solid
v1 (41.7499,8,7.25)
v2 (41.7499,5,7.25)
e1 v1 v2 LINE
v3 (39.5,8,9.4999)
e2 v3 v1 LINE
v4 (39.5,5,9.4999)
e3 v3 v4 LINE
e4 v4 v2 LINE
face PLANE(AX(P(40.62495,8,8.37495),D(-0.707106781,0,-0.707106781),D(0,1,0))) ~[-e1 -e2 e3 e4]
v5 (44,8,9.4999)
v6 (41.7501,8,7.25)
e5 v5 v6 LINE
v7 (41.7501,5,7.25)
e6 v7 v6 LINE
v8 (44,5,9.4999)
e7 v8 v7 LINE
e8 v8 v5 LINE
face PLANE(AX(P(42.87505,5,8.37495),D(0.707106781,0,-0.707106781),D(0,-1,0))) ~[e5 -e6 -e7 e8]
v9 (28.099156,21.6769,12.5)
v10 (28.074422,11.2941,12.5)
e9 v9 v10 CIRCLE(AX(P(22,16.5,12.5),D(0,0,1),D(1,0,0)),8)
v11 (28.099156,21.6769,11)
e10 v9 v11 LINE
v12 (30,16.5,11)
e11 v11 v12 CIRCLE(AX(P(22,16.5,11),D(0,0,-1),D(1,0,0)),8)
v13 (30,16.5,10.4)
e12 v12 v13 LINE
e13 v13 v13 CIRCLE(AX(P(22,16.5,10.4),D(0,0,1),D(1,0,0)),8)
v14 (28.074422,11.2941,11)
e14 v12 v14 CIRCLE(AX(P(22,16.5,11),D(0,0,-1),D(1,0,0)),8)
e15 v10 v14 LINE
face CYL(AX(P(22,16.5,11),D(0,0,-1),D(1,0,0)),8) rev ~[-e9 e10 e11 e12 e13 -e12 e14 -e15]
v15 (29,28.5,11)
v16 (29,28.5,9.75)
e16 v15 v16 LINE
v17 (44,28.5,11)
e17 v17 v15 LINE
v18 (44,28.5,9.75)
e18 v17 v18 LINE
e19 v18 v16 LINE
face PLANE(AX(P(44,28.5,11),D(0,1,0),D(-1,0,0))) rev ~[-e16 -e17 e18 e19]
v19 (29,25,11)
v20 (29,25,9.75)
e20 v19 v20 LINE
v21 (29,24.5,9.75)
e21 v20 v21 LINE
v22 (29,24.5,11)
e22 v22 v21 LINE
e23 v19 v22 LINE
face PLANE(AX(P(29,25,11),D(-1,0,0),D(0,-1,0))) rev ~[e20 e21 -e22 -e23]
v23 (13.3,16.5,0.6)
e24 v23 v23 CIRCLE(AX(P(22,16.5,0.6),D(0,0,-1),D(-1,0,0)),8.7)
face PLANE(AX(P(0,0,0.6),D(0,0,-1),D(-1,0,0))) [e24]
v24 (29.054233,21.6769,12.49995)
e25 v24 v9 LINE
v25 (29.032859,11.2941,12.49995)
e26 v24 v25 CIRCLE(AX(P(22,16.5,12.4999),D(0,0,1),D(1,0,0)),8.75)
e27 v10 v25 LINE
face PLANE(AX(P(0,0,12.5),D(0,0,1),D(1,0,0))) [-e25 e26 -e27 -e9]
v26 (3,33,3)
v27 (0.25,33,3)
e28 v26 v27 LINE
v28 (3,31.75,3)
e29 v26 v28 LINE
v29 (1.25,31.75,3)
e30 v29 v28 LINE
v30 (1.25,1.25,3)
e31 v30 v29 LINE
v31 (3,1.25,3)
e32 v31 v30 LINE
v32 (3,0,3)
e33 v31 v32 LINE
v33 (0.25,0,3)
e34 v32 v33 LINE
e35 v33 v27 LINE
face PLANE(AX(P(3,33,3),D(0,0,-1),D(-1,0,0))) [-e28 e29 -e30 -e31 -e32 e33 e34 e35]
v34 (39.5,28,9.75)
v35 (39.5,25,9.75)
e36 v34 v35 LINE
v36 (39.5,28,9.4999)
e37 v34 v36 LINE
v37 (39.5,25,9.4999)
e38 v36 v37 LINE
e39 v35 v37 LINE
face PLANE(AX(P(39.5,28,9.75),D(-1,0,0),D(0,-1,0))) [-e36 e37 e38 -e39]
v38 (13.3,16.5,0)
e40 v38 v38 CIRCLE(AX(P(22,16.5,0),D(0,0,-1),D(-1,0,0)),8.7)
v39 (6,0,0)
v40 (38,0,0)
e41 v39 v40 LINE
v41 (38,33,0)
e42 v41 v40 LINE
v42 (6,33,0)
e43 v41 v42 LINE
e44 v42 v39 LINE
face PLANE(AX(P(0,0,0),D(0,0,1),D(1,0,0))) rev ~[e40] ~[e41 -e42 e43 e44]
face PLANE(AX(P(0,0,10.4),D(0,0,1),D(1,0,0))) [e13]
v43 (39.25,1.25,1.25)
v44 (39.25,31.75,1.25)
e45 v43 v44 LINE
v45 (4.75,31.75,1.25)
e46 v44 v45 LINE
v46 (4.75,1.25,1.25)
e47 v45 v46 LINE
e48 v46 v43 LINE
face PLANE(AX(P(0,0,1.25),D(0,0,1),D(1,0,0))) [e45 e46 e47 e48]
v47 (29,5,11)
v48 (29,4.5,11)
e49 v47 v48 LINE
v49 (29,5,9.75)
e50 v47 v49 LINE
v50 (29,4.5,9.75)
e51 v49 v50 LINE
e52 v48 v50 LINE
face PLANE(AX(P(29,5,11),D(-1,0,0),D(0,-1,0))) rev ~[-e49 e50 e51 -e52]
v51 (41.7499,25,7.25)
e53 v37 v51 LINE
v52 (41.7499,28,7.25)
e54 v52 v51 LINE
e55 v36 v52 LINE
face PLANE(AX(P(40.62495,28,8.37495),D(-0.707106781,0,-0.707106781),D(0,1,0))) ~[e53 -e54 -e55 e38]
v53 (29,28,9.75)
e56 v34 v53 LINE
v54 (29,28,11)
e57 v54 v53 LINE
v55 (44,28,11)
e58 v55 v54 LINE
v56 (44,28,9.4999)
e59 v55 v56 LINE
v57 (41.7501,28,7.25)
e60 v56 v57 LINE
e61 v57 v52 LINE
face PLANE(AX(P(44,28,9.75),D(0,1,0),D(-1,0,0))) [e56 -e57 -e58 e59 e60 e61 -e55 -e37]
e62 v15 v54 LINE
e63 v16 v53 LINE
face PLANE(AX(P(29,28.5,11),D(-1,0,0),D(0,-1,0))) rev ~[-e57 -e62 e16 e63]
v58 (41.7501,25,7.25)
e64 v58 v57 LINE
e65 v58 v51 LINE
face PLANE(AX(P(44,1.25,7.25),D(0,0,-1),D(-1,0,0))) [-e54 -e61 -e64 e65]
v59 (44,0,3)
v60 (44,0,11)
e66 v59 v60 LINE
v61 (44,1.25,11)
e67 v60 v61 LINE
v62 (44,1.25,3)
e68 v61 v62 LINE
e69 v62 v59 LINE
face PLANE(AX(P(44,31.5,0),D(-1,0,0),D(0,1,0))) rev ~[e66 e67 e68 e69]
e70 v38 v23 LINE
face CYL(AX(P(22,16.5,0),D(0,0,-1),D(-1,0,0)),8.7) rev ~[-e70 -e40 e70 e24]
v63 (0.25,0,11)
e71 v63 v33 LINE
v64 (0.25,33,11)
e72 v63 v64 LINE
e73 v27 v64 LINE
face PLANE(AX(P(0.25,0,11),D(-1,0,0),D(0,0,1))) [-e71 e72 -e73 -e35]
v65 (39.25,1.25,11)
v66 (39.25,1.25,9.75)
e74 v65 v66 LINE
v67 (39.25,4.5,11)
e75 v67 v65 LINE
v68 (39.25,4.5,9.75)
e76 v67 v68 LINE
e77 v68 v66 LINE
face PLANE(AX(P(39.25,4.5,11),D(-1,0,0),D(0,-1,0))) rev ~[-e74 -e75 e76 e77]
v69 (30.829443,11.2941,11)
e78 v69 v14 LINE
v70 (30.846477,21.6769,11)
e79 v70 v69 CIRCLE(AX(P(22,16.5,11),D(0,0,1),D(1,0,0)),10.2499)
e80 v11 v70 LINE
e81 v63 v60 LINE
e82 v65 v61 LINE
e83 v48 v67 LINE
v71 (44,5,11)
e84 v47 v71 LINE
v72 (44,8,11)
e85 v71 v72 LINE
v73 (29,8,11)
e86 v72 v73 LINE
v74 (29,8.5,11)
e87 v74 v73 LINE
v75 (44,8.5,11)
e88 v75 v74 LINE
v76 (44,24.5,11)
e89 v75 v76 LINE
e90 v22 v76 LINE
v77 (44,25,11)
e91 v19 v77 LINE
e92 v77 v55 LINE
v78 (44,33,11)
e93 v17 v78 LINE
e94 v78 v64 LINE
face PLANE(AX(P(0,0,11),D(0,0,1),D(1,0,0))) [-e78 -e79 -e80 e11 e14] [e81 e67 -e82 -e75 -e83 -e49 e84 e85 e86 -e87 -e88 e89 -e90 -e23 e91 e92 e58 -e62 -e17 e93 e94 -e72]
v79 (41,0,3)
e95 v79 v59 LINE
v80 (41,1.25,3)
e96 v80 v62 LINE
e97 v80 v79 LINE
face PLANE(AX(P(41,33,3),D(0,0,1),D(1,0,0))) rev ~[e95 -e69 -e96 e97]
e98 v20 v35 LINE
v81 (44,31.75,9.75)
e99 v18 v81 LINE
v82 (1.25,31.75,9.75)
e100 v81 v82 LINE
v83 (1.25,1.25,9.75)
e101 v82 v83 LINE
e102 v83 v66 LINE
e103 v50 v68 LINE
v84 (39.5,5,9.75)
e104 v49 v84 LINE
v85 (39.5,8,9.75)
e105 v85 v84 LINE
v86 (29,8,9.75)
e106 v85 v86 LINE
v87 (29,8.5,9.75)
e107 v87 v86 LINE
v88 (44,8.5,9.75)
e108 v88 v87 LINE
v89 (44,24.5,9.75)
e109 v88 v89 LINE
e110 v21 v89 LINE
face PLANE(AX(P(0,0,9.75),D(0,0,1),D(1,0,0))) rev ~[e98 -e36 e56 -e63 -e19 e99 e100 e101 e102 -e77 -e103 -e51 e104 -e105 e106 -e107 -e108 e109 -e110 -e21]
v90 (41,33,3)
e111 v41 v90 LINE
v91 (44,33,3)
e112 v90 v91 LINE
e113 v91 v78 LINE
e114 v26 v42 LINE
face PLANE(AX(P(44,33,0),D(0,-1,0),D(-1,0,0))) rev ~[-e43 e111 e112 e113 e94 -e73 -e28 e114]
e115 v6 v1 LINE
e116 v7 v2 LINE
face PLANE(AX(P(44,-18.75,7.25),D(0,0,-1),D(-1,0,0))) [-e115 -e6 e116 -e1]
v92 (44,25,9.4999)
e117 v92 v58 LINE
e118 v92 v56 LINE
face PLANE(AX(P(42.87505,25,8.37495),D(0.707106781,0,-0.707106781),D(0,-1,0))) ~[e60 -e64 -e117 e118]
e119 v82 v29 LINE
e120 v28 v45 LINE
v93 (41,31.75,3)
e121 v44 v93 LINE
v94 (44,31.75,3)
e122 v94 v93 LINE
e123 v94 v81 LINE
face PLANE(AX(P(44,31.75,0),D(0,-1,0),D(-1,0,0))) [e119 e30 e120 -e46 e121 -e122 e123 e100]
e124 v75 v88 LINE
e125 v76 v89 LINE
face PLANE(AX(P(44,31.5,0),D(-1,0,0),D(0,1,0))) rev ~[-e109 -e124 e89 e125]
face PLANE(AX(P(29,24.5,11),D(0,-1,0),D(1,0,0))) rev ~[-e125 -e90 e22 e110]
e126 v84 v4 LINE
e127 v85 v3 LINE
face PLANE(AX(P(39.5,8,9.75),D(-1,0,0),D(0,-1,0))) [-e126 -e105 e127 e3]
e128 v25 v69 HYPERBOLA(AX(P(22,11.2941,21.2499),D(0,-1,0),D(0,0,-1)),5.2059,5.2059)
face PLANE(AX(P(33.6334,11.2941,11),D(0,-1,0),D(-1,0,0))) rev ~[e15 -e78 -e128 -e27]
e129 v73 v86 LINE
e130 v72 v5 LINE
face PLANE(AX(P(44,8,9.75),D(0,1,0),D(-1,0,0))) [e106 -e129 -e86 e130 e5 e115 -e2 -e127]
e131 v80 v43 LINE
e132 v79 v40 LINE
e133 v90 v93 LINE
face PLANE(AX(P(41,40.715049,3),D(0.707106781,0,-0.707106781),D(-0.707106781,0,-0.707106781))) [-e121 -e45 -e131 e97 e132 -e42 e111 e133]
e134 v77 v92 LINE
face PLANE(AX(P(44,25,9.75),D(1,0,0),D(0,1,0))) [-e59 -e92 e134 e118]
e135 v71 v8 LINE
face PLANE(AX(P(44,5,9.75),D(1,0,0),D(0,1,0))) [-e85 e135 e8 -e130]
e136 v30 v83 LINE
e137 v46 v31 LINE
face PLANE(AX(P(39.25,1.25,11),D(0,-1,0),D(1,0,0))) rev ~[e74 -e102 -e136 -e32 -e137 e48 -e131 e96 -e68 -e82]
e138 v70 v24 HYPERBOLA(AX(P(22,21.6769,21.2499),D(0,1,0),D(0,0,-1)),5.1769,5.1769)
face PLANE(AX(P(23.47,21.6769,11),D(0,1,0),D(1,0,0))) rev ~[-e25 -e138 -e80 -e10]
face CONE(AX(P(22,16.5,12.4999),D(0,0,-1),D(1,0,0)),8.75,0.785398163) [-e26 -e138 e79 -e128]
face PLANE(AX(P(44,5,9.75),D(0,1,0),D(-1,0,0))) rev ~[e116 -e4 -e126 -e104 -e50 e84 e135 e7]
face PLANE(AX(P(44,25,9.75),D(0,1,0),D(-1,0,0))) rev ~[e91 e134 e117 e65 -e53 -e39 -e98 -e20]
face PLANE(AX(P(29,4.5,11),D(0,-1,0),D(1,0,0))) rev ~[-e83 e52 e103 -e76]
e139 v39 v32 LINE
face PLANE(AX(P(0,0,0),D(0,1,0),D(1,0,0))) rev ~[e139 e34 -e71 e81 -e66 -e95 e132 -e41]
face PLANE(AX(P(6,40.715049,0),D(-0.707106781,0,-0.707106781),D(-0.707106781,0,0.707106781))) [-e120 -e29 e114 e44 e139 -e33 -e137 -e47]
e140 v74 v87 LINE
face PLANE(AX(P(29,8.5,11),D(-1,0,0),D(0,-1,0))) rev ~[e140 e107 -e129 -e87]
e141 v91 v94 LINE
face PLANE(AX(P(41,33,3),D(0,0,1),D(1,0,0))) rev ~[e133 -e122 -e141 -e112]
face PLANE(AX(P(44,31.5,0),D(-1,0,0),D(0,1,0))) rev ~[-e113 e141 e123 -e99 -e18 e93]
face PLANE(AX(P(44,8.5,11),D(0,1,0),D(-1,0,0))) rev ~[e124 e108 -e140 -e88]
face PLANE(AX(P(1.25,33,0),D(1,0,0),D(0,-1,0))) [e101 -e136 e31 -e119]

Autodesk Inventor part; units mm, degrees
ref_plane "YZ Plane" through (0, 0, 0) normal (1, 0, 0) x (0, 1, 0)
ref_plane "XZ Plane" through (0, 0, 0) normal (0, 1, 0) x (-1, 0, 0)
ref_plane "XY Plane" through (0, 0, 0) normal (0, 0, 1) x (1, 0, 0)
sketch "Sketch1" plane through (0, 0, 0) normal (0, 0, 1) x (1, 0, 0)
  line L0 (0, 0) -> (44, 0)
  line L1 (44, 0) -> (44, 33)
  line L2 (44, 33) -> (0, 33)
  line L3 (0, 33) -> (0, 0)
  line L4 (2, 1.5) -> (44, 1.5)
  line L5 (44, 1.5) -> (44, 31.5)
  line L6 (44, 31.5) -> (2, 31.5)
  line L7 (2, 31.5) -> (2, 1.5)
  dimension "d0" = 44
  dimension "d1" = 33
  dimension "d2" = 42
  dimension "d3" = 30
  dimension "d4" = 2
  dimension "d5" = 0
  dimension "d6" = 1.5
extrude "Extrusion1" add sketch "Sketch1" along normal blind 11
shell "Shell1" thickness 1.25 removed faces 1 at (44, 11, 3.6667)
sketch "Sketch2" plane through (0, 0, 11) normal (0, 0, 1) x (1, 0, 0)
  circle A0 centre (22, 16.5) radius 8
  circle A1 centre (22, 16.5) radius 8.75
  point P0 (0, 0)
  dimension "d10" = 16
  dimension "d11" = 17.5
extrude "Extrusion2" add sketch "Sketch2" along normal blind 1.5
sketch "Sketch3" plane through (22, 16.5, 11) normal (0, 0, 1) x (1, 0, 0)
  line L0 (1.47, 5.1769) -> (11.6334, 5.1769)
  line L1 (11.6334, 5.1769) -> (11.6334, -5.2059)
  line L2 (11.6334, -5.2059) -> (1.47, -5.2059)
  line L3 (1.47, -5.2059) -> (1.47, 5.1769)
  line L4 (1.47, 5.1769) -> (11.6334, -5.2059) construction
  line L5 (11.6334, 5.1769) -> (1.47, -5.2059) construction
  point P0 (-22, -16.5)
  point P1 (6.5517, -0.0145)
extrude "Extrusion3" cut sketch "Sketch2" against normal blind 0.6 contours A0
sketch "Sketch4" plane through (0, 0, 0) normal (0, 0, -1) x (-1, 0, 0)
  circle A0 centre (-22, 16.5) radius 8.7
  line L0 (-44, 33) -> (0, 33) projected
  line L1 (0, 33) -> (0, 0) projected
  dimension "d16" = 17.4
  dimension "d22" = 16.5
  dimension "d23" = 22
extrude "Extrusion4" cut sketch "Sketch4" against normal blind 0.6
chamfer "Chamfer1" distance 1.5 angle 45 1 edges at (13.25, 16.5, 11)
extrude "Extrusion5" cut sketch "Sketch3" along normal blind 2
sketch "Sketch5" plane through (0, 33, 0) normal (0, 1, 0) x (1, 0, 0)
  line L0 (0, 0) -> (3, 0)
  line L1 (3, 0) -> (3, -3)
  line L2 (3, -3) -> (0, -3)
  line L3 (0, -3) -> (0, 0)
  line L4 (0, 0) -> (44, 0) projected
  line L5 (44, 0) -> (41, 0)
  line L6 (41, 0) -> (41, -3)
  line L7 (41, -3) -> (44, -3)
  line L8 (44, -3) -> (44, 0)
  dimension "d26" = 3
  dimension "d27" = 3
  dimension "d28" = 3
  dimension "d29" = 3
extrude "Extrusion6" cut sketch "Sketch5" against normal through all
sketch "Sketch6" plane through (0, 0, 11) normal (-1, 0, 0) x (0, 0, 1)
  line L0 (0, 0) -> (0, 33) projected
  line L1 (-11, 33) -> (-11, 0) projected
  line L2 (0, 0) -> (-11, 0)
  line L3 (-11, 0) -> (-11, 33)
  line L4 (-11, 33) -> (0, 33)
  line L5 (0, 33) -> (0, 0)
extrude "Extrusion7" cut sketch "Sketch6" against normal blind 0.25
chamfer "Chamfer2" distance 3 angle 45 2 edges at (3, 16.5, 0) (41, 16.5, 0)
sketch "Sketch7" plane through (0, 0, 11) normal (0, 0, 1) x (1, 0, 0)
  line L0 (44, 1.25) -> (44, 31.75) projected
  line L1 (44, 28) -> (29, 28)
  line L2 (29, 28) -> (29, 25)
  line L3 (29, 25) -> (44, 25)
  line L4 (44, 25) -> (44, 28)
  line L5 (44, 33) -> (0.25, 33) projected
  line L6 (44, 28.5) -> (29, 28.5)
  line L7 (29, 28.5) -> (29, 24.5)
  line L8 (29, 24.5) -> (44, 24.5)
  line L9 (44, 24.5) -> (44, 28.5)
  point P0 (0, 0)
  dimension "d37" = 15
  dimension "d38" = 3
  dimension "d39" = 5
  dimension "d40" = 4
extrude "Extrusion8" cut sketch "Sketch7" against normal blind 1.5 contours L8 L7 L3 L0 | L1 L7 L6 L0
sketch "Sketch8" plane through (44, 1.25, 9.75) normal (0, 0, -1) x (-1, 0, 0)
  line L0 (0, 26.75) -> (15, 26.75) projected
  line L1 (0, 23.75) -> (15, 23.75) projected
  line L2 (0, 26.75) -> (4.5, 26.75)
  line L3 (4.5, 26.75) -> (4.5, 23.75)
  line L4 (4.5, 23.75) -> (0, 23.75)
  line L5 (0, 23.75) -> (0, 26.75)
  point P0 (44, -1.25)
  point P1 (4.5, 26.75)
  dimension "d43" = 4.5
extrude "Extrusion9" add sketch "Sketch8" along normal blind 2.5
chamfer "Chamfer3" distance 2.25 angle 45 2 edges at (44, 26.5, 7.25) (39.5, 26.5, 7.25)
pattern_linear "Rectangular Pattern1" count 2 spacing 20 along (0, -1, 0) of "Extrusion9", "Chamfer3", "Extrusion8"
sketch "Sketch9" plane through (0, 0, 11) normal (0, 0, 1) x (1, 0, 0)
  line L0 (44, 4.5) -> (29, 4.5) projected
  line L1 (4.75, 1.25) -> (39.25, 1.25) projected
  line L2 (44, 4.5) -> (39.25, 4.5)
  line L3 (39.25, 4.5) -> (39.25, 1.25)
  line L4 (39.25, 1.25) -> (44, 1.25)
  line L5 (44, 1.25) -> (44, 4.5)
  point P0 (0, 0)
extrude "Extrusion10" cut sketch "Sketch9" against normal blind 2.5
properties part number "ButtonBatteryHolder"
